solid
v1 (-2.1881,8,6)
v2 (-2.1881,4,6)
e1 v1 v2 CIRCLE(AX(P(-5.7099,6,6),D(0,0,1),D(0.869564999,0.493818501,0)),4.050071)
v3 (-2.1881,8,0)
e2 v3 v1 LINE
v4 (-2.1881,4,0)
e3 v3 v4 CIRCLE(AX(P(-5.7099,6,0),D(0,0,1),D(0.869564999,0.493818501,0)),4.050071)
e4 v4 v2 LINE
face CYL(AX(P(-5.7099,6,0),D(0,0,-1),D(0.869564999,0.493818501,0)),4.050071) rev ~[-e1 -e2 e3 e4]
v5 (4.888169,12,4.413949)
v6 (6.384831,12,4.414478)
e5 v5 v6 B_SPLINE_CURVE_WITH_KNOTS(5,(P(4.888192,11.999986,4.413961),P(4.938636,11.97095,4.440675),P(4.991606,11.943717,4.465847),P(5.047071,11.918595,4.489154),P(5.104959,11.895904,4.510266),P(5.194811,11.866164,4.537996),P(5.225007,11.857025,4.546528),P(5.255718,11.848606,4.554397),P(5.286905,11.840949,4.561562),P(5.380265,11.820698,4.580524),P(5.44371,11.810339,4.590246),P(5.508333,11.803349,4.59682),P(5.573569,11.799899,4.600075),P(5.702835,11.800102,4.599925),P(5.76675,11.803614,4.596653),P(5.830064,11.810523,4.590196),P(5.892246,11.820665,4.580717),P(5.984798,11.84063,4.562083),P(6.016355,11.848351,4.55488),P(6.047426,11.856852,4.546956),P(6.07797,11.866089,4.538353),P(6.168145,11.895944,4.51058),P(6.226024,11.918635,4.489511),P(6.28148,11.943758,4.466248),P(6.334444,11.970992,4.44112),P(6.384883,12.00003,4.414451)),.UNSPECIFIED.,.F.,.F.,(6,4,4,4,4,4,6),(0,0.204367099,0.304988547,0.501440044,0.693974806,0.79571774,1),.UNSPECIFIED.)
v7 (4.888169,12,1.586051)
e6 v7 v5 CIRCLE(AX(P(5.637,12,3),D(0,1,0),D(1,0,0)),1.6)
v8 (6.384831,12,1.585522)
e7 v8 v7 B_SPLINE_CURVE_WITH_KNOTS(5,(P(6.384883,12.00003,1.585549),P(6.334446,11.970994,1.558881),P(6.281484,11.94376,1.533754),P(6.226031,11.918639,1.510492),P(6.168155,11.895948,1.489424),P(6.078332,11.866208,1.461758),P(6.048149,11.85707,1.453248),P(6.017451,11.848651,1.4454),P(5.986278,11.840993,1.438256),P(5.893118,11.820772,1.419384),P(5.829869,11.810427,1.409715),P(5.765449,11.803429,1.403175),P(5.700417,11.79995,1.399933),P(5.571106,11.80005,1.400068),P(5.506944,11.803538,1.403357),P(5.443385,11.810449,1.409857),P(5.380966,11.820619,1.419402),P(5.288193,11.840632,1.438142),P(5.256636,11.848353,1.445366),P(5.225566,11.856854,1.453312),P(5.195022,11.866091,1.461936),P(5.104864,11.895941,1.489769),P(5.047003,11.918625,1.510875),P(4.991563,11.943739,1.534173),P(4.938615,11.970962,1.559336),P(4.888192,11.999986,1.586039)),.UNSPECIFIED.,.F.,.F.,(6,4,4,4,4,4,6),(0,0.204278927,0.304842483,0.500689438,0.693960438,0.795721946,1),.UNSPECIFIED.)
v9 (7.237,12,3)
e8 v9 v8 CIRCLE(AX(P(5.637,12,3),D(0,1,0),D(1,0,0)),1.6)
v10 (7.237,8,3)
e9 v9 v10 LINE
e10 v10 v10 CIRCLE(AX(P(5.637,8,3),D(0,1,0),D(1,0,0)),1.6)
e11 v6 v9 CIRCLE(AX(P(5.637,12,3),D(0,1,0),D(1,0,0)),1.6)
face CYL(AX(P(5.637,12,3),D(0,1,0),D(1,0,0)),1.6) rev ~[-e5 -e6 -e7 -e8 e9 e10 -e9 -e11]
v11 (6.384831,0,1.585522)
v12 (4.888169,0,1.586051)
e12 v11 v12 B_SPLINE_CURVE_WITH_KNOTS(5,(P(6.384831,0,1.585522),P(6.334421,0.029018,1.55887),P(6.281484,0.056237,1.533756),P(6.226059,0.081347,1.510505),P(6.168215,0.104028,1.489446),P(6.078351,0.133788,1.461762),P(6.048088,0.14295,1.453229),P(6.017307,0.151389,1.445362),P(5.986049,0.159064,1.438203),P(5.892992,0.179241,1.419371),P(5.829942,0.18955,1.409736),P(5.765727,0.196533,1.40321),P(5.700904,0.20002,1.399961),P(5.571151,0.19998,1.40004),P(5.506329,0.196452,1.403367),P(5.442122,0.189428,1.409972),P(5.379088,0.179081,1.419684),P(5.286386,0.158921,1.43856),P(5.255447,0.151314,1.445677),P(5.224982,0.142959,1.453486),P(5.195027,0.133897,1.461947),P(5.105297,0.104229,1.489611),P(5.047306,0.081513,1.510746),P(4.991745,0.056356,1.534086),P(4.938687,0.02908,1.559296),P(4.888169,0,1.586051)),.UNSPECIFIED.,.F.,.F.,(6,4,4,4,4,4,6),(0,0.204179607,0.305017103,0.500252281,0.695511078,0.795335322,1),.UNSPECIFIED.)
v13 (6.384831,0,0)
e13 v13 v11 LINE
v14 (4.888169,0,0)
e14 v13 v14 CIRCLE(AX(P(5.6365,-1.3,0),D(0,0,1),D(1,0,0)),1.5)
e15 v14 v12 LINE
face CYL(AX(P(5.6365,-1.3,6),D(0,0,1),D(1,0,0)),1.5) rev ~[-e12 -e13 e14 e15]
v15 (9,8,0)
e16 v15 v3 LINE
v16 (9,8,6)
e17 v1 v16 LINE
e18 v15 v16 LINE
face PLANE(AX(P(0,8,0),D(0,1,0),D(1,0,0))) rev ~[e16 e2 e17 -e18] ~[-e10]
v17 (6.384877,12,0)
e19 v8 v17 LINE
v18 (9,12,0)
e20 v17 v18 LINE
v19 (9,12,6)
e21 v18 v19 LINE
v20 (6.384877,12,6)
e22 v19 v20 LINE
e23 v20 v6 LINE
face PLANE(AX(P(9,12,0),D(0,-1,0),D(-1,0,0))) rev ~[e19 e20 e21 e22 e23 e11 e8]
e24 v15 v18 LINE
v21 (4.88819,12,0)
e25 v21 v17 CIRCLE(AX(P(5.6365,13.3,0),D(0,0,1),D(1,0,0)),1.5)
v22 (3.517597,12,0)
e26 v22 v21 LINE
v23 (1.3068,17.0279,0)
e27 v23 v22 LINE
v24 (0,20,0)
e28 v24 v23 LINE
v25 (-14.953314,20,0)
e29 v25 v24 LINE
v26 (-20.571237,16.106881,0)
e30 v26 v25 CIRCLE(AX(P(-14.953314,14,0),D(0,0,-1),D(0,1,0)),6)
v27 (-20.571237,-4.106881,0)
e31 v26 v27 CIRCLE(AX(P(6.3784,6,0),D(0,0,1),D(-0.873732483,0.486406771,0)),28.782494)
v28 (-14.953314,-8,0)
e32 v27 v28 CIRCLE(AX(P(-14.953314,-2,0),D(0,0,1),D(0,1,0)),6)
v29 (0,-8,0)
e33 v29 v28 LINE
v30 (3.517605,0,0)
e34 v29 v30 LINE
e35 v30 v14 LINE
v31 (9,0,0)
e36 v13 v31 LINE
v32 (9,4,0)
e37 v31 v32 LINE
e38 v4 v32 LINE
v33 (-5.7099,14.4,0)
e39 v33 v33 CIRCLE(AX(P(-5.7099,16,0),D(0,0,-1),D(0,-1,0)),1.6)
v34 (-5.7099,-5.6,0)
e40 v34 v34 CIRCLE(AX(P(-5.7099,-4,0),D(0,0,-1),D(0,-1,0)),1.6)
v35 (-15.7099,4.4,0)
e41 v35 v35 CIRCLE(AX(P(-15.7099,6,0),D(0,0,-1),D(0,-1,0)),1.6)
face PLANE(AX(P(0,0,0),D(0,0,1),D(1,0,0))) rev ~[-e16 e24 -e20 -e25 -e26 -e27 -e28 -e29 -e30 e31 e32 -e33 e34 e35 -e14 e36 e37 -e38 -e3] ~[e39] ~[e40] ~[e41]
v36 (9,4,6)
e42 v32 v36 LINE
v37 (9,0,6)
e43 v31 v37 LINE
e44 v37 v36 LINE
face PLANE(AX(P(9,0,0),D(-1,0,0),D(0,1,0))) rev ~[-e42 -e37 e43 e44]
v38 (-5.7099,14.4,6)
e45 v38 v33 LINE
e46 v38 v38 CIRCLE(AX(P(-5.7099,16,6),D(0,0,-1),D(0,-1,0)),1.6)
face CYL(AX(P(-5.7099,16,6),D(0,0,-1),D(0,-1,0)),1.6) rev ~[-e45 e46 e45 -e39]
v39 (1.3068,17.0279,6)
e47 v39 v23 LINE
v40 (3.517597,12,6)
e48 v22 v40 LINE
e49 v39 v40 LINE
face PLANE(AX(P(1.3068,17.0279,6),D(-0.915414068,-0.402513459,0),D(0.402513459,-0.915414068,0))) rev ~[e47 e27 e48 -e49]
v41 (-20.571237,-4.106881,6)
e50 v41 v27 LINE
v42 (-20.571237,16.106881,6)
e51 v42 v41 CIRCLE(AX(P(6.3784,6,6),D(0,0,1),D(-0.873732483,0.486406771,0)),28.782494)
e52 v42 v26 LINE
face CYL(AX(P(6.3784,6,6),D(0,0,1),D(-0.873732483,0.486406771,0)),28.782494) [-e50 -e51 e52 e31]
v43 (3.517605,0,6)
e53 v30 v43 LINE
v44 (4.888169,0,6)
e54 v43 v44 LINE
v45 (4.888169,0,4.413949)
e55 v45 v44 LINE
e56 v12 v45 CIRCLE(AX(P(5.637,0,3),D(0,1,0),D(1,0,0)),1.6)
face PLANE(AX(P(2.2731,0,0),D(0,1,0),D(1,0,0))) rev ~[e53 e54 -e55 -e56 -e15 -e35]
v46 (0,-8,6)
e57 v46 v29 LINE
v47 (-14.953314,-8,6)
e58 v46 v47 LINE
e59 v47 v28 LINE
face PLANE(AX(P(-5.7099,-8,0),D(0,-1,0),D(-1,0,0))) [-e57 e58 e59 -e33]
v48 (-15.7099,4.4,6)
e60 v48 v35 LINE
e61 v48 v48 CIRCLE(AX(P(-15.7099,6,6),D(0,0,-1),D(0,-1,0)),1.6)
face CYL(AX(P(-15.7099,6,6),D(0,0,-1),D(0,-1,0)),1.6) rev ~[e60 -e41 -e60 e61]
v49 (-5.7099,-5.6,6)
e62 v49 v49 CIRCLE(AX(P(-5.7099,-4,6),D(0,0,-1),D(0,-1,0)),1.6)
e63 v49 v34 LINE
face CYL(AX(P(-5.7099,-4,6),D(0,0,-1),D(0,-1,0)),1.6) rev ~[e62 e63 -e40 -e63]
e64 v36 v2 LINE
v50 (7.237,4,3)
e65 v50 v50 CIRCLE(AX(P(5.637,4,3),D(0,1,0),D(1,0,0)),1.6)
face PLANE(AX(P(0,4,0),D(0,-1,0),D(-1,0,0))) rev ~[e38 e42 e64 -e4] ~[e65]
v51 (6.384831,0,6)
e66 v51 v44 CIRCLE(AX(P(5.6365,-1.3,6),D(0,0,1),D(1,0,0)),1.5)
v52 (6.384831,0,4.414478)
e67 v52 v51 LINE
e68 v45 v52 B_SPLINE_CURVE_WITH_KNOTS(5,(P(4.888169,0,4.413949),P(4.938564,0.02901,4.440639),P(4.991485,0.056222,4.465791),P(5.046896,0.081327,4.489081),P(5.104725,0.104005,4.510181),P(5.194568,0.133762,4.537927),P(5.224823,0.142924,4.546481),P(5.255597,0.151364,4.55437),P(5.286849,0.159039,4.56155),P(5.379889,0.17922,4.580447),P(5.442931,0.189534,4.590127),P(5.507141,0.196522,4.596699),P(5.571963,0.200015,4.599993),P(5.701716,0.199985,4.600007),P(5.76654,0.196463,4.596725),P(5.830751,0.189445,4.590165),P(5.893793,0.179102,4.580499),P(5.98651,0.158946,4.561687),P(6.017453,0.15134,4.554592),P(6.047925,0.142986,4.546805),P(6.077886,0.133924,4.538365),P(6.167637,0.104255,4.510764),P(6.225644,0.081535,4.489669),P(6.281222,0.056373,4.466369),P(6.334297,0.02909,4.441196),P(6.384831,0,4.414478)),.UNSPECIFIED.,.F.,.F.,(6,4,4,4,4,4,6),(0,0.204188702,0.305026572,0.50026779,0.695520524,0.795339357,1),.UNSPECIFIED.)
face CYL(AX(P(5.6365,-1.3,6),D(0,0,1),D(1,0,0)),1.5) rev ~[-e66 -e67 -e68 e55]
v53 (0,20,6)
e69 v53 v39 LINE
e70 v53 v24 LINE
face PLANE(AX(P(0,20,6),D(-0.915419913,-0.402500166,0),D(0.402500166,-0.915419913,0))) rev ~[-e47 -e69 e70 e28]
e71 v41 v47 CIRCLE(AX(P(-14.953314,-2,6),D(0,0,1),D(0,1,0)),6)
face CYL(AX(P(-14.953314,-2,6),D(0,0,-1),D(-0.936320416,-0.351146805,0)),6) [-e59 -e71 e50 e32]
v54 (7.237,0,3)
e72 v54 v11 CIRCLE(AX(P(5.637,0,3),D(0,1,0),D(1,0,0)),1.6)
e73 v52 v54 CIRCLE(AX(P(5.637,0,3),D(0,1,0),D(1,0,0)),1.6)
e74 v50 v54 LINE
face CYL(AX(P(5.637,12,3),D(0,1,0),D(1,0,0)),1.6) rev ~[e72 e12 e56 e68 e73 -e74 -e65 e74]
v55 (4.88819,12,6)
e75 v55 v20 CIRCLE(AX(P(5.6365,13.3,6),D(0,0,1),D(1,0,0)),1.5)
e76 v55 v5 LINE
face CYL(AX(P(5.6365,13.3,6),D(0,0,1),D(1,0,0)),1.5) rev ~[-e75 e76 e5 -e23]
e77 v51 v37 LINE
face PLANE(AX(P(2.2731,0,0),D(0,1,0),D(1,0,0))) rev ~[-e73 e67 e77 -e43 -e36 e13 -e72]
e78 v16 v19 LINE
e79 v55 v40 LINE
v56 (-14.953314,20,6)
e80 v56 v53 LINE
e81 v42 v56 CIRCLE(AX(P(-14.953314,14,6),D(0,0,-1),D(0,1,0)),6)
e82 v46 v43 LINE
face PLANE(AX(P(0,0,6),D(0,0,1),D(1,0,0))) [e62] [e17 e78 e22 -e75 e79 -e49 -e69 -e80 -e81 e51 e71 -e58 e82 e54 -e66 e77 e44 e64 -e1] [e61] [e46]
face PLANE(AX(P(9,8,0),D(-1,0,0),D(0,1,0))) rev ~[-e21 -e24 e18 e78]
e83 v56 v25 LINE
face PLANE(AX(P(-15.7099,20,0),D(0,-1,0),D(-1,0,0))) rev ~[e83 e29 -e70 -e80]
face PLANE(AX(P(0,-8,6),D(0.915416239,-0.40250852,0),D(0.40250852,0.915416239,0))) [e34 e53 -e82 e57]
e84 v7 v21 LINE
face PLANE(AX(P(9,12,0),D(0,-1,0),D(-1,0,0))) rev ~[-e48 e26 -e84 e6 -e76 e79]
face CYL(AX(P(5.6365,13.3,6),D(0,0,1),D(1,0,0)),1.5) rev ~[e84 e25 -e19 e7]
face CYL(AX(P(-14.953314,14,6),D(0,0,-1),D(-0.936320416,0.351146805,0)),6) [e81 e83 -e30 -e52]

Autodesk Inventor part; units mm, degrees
ref_plane "YZ Plane" through (0, 0, 0) normal (1, 0, 0) x (0, 1, 0)
ref_plane "XZ Plane" through (0, 0, 0) normal (0, 1, 0) x (-1, 0, 0)
ref_plane "XY Plane" through (0, 0, 0) normal (0, 0, 1) x (1, 0, 0)
sketch "スケッチ1" plane through (0, 0, 0) normal (0, 0, 1) x (1, 0, 0)
  line L0 (9, 0) -> (9, 4)
  line L1 (9, 12) -> (2.2731, 12)
  line L2 (0, 8) -> (9, 8)
  line L3 (0, 4) -> (9, 4)
  line L4 (9, 8) -> (9, 12)
  line L5 (2.2731, 12) -> (0, 14.2779)
  line L6 (2.2731, 0) -> (-5.7099, -8)
  line L7 (-5.7099, 20) -> (-15.7099, 20)
  line L8 (-5.7099, -8) -> (-15.7099, -8)
  line L9 (-15.7099, 20) -> (-25.7698, 20)
  line L10 (-25.7698, 20) -> (-25.7698, -8)
  line L11 (-25.7698, -8) -> (-15.7099, -8)
  line L12 (2.2731, 0) -> (9, 0)
  line L13 (0, 14.2779) -> (-5.7099, 20)
  arc A0 (-2.1881, 8) -> (-2.1881, 4) centre (-5.7099, 6) ccw
  line L14 (0, 8) -> (-2.1881, 8)
  line L15 (0, 4) -> (-2.1881, 4)
  point P0 (0, 0)
  point P1 (4.5, 12)
  point P2 (4.5, 0)
  point P3 (4.5, 4)
  point P4 (-25.7099, 6)
  dimension "d5" = 4
  dimension "d8" = 10
  dimension "d9" = 10
  dimension "d12" = 14
  dimension "d90" = 8.1
extrude "押し出し1" add sketch "スケッチ1" along normal blind 6
sketch "スケッチ2" plane through (0, 0, 6) normal (0, 0, 1) x (1, 0, 0)
  circle A0 centre (5.6365, 13.3) radius 1.5
  line L0 (9, 8) -> (9, 12) projected
  line L1 (11.5477, 6) -> (-28.1936, 6) construction
  line L2 (9, 12) -> (2.2731, 12) projected
  circle A1 centre (5.6365, -1.3) radius 1.5
  point P0 (0, 0)
  point P1 (4.8882, 12)
  point P2 (6.3849, 12)
  dimension "d15" = 3
  dimension "d16" = 3.3635
  dimension "d17" = 1.3
extrude "押し出し2" cut sketch "スケッチ2" against normal blind 6 contours A0 L2 | A1 picked at (5.4614, 13.0013)
sketch "スケッチ3" plane through (0, 0, 6) normal (0, 0, 1) x (1, 0, 0)
  circle A0 centre (5.6365, 13.3) radius 1.5
  line L0 (9, 12) -> (2.2731, 12) projected
  point P0 (0, 0)
  point P1 (4.8882, 12)
  point P2 (6.3849, 12)
  dimension "d20" = 3
  dimension "d21" = 1.3
extrude "押し出し3" add sketch "スケッチ3" against normal blind 6 contours A0 L0 picked at (5.4614, 13.0013)
sketch "スケッチ4" plane through (0, 0, 6) normal (0, 0, 1) x (1, 0, 0)
  arc A0 (6.3849, 12) -> (4.8882, 12) centre (5.6365, 13.3) ccw projected
  circle A1 centre (5.6365, 13.3) radius 1.5
  point P0 (0, 0)
  dimension "d24" = 3
extrude "押し出し4" cut sketch "スケッチ4" against normal blind 6
fillet "フィレット1" radius 5 1 edges at (-25.7698, 20, 3)
fillet "フィレット2" radius 5 1 edges at (-25.7698, -8, 3)
fillet "フィレット3" radius 3 4 edges at (-5.7099, -8, 3) (2.2731, 0, 3) (-5.7099, 20, 3) (2.2731, 12, 3)
sketch "スケッチ6" plane through (0, 4, 0) normal (0, 1, 0) x (1, 0, 0)
  point P0 (0, 0)
sketch "スケッチ7" plane through (4.8882, 12, 6) normal (0, 1, 0) x (1, 0, 0)
  circle A0 centre (0.7488, 3) radius 1.6
  line L0 (1.4967, 0) -> (0, 0) projected
  line L1 (4.1118, 6) -> (4.1118, 0) projected
  point P0 (-4.8882, 6)
  point P1 (0.7483, 0)
  dimension "d43" = 3.2
  dimension "d44" = 3
  dimension "d45" = 3.363
extrude "押し出し5" cut sketch "スケッチ7" against normal blind 28
sketch "スケッチ11" plane through (0, 0, 6) normal (0, 0, 1) x (1, 0, 0)
  line L0 (-6.9544, 20) -> (-20.7698, 20) projected
  line L1 (-20.7698, 20) -> (-6.9544, 20)
  arc A0 (1.394, 12.8809) -> (3.5176, 12) centre (3.5176, 15) ccw projected
  line L2 (0, 20) -> (1.3068, 17.0279)
  arc A1 (1.394, 12.8809) -> (3.5176, 12) centre (3.5176, 15) ccw
  arc A2 (-4.8308, 19.1191) -> (-6.9544, 20) centre (-6.9544, 17) ccw projected
  arc A3 (-4.8308, 19.1191) -> (-6.9544, 20) centre (-6.9544, 17) ccw
  line L3 (1.394, 12.8809) -> (-4.8308, 19.1191) projected
  line L4 (-4.8308, 19.1191) -> (1.394, 12.8809)
  arc A4 (0, 8) -> (0, 4) centre (-5.7099, 6) ccw projected
  line L5 (-11.7599, 6) -> (12.1155, 6) construction
  line L6 (-20.7698, -8) -> (0, -8)
  line L7 (0, -8) -> (3.5176, 0)
  arc A5 (-6.9544, -8) -> (-4.8308, -7.1191) centre (-6.9544, -5) ccw
  line L8 (1.394, -0.8809) -> (-4.8308, -7.1191)
  line L9 (-6.9544, 20) -> (0, 20)
  line L10 (1.3068, 17.0279) -> (3.5176, 12)
  arc A6 (3.5176, 0) -> (1.394, -0.8809) centre (3.5176, -3) ccw
  point P0 (0, 0)
extrude "押し出し6" add sketch "スケッチ11" against normal blind 6
sketch "スケッチ12" plane through (0, 0, 6) normal (0, 0, 1) x (1, 0, 0)
  arc A0 (0, 8) -> (0, 4) centre (-5.7099, 6) ccw projected
  point P0 (0, 0)
  point P1 (-15.7099, 6)
  point P2 (-5.7099, 16)
  point P3 (-5.7099, -4)
  dimension "d74" = 10
  dimension "d76" = 10
  dimension "d77" = 10
hole "穴4" at (-15.7099, 6, 6) at (-5.7099, 16, 6) at (-5.7099, -4, 6) direction (0, 0, -1) diameter 3.2 end through all
sketch "スケッチ13" plane through (0, 0, 6) normal (0, 0, 1) x (1, 0, 0)
  line L0 (-20.7698, -8) -> (0, -8) projected
  line L1 (0, 20) -> (-20.7698, 20) projected
  line L2 (-18.7698, 20) -> (-18.7698, -8) construction
  line L3 (-25.7698, 15) -> (-25.7698, -3) projected
  arc A0 (-18.7698, 20) -> (-18.7698, -8) centre (6.3784, 6) ccw
  line L4 (-18.7698, 20) -> (-29.3351, 20)
  line L5 (-29.3351, 20) -> (-29.3351, -8)
  line L6 (-29.3351, -8) -> (-18.7698, -8)
  point P0 (0, 0)
  dimension "d85" = 7
extrude "押し出し7" cut sketch "スケッチ13" against normal blind 6
fillet "フィレット4" radius 6 1 edges at (-18.7698, 20, 3)
fillet "フィレット5" radius 6 1 edges at (-18.7698, -8, 3)
properties part number "射出_腕固定2_真" material "ポリカーボネート、クリア"
